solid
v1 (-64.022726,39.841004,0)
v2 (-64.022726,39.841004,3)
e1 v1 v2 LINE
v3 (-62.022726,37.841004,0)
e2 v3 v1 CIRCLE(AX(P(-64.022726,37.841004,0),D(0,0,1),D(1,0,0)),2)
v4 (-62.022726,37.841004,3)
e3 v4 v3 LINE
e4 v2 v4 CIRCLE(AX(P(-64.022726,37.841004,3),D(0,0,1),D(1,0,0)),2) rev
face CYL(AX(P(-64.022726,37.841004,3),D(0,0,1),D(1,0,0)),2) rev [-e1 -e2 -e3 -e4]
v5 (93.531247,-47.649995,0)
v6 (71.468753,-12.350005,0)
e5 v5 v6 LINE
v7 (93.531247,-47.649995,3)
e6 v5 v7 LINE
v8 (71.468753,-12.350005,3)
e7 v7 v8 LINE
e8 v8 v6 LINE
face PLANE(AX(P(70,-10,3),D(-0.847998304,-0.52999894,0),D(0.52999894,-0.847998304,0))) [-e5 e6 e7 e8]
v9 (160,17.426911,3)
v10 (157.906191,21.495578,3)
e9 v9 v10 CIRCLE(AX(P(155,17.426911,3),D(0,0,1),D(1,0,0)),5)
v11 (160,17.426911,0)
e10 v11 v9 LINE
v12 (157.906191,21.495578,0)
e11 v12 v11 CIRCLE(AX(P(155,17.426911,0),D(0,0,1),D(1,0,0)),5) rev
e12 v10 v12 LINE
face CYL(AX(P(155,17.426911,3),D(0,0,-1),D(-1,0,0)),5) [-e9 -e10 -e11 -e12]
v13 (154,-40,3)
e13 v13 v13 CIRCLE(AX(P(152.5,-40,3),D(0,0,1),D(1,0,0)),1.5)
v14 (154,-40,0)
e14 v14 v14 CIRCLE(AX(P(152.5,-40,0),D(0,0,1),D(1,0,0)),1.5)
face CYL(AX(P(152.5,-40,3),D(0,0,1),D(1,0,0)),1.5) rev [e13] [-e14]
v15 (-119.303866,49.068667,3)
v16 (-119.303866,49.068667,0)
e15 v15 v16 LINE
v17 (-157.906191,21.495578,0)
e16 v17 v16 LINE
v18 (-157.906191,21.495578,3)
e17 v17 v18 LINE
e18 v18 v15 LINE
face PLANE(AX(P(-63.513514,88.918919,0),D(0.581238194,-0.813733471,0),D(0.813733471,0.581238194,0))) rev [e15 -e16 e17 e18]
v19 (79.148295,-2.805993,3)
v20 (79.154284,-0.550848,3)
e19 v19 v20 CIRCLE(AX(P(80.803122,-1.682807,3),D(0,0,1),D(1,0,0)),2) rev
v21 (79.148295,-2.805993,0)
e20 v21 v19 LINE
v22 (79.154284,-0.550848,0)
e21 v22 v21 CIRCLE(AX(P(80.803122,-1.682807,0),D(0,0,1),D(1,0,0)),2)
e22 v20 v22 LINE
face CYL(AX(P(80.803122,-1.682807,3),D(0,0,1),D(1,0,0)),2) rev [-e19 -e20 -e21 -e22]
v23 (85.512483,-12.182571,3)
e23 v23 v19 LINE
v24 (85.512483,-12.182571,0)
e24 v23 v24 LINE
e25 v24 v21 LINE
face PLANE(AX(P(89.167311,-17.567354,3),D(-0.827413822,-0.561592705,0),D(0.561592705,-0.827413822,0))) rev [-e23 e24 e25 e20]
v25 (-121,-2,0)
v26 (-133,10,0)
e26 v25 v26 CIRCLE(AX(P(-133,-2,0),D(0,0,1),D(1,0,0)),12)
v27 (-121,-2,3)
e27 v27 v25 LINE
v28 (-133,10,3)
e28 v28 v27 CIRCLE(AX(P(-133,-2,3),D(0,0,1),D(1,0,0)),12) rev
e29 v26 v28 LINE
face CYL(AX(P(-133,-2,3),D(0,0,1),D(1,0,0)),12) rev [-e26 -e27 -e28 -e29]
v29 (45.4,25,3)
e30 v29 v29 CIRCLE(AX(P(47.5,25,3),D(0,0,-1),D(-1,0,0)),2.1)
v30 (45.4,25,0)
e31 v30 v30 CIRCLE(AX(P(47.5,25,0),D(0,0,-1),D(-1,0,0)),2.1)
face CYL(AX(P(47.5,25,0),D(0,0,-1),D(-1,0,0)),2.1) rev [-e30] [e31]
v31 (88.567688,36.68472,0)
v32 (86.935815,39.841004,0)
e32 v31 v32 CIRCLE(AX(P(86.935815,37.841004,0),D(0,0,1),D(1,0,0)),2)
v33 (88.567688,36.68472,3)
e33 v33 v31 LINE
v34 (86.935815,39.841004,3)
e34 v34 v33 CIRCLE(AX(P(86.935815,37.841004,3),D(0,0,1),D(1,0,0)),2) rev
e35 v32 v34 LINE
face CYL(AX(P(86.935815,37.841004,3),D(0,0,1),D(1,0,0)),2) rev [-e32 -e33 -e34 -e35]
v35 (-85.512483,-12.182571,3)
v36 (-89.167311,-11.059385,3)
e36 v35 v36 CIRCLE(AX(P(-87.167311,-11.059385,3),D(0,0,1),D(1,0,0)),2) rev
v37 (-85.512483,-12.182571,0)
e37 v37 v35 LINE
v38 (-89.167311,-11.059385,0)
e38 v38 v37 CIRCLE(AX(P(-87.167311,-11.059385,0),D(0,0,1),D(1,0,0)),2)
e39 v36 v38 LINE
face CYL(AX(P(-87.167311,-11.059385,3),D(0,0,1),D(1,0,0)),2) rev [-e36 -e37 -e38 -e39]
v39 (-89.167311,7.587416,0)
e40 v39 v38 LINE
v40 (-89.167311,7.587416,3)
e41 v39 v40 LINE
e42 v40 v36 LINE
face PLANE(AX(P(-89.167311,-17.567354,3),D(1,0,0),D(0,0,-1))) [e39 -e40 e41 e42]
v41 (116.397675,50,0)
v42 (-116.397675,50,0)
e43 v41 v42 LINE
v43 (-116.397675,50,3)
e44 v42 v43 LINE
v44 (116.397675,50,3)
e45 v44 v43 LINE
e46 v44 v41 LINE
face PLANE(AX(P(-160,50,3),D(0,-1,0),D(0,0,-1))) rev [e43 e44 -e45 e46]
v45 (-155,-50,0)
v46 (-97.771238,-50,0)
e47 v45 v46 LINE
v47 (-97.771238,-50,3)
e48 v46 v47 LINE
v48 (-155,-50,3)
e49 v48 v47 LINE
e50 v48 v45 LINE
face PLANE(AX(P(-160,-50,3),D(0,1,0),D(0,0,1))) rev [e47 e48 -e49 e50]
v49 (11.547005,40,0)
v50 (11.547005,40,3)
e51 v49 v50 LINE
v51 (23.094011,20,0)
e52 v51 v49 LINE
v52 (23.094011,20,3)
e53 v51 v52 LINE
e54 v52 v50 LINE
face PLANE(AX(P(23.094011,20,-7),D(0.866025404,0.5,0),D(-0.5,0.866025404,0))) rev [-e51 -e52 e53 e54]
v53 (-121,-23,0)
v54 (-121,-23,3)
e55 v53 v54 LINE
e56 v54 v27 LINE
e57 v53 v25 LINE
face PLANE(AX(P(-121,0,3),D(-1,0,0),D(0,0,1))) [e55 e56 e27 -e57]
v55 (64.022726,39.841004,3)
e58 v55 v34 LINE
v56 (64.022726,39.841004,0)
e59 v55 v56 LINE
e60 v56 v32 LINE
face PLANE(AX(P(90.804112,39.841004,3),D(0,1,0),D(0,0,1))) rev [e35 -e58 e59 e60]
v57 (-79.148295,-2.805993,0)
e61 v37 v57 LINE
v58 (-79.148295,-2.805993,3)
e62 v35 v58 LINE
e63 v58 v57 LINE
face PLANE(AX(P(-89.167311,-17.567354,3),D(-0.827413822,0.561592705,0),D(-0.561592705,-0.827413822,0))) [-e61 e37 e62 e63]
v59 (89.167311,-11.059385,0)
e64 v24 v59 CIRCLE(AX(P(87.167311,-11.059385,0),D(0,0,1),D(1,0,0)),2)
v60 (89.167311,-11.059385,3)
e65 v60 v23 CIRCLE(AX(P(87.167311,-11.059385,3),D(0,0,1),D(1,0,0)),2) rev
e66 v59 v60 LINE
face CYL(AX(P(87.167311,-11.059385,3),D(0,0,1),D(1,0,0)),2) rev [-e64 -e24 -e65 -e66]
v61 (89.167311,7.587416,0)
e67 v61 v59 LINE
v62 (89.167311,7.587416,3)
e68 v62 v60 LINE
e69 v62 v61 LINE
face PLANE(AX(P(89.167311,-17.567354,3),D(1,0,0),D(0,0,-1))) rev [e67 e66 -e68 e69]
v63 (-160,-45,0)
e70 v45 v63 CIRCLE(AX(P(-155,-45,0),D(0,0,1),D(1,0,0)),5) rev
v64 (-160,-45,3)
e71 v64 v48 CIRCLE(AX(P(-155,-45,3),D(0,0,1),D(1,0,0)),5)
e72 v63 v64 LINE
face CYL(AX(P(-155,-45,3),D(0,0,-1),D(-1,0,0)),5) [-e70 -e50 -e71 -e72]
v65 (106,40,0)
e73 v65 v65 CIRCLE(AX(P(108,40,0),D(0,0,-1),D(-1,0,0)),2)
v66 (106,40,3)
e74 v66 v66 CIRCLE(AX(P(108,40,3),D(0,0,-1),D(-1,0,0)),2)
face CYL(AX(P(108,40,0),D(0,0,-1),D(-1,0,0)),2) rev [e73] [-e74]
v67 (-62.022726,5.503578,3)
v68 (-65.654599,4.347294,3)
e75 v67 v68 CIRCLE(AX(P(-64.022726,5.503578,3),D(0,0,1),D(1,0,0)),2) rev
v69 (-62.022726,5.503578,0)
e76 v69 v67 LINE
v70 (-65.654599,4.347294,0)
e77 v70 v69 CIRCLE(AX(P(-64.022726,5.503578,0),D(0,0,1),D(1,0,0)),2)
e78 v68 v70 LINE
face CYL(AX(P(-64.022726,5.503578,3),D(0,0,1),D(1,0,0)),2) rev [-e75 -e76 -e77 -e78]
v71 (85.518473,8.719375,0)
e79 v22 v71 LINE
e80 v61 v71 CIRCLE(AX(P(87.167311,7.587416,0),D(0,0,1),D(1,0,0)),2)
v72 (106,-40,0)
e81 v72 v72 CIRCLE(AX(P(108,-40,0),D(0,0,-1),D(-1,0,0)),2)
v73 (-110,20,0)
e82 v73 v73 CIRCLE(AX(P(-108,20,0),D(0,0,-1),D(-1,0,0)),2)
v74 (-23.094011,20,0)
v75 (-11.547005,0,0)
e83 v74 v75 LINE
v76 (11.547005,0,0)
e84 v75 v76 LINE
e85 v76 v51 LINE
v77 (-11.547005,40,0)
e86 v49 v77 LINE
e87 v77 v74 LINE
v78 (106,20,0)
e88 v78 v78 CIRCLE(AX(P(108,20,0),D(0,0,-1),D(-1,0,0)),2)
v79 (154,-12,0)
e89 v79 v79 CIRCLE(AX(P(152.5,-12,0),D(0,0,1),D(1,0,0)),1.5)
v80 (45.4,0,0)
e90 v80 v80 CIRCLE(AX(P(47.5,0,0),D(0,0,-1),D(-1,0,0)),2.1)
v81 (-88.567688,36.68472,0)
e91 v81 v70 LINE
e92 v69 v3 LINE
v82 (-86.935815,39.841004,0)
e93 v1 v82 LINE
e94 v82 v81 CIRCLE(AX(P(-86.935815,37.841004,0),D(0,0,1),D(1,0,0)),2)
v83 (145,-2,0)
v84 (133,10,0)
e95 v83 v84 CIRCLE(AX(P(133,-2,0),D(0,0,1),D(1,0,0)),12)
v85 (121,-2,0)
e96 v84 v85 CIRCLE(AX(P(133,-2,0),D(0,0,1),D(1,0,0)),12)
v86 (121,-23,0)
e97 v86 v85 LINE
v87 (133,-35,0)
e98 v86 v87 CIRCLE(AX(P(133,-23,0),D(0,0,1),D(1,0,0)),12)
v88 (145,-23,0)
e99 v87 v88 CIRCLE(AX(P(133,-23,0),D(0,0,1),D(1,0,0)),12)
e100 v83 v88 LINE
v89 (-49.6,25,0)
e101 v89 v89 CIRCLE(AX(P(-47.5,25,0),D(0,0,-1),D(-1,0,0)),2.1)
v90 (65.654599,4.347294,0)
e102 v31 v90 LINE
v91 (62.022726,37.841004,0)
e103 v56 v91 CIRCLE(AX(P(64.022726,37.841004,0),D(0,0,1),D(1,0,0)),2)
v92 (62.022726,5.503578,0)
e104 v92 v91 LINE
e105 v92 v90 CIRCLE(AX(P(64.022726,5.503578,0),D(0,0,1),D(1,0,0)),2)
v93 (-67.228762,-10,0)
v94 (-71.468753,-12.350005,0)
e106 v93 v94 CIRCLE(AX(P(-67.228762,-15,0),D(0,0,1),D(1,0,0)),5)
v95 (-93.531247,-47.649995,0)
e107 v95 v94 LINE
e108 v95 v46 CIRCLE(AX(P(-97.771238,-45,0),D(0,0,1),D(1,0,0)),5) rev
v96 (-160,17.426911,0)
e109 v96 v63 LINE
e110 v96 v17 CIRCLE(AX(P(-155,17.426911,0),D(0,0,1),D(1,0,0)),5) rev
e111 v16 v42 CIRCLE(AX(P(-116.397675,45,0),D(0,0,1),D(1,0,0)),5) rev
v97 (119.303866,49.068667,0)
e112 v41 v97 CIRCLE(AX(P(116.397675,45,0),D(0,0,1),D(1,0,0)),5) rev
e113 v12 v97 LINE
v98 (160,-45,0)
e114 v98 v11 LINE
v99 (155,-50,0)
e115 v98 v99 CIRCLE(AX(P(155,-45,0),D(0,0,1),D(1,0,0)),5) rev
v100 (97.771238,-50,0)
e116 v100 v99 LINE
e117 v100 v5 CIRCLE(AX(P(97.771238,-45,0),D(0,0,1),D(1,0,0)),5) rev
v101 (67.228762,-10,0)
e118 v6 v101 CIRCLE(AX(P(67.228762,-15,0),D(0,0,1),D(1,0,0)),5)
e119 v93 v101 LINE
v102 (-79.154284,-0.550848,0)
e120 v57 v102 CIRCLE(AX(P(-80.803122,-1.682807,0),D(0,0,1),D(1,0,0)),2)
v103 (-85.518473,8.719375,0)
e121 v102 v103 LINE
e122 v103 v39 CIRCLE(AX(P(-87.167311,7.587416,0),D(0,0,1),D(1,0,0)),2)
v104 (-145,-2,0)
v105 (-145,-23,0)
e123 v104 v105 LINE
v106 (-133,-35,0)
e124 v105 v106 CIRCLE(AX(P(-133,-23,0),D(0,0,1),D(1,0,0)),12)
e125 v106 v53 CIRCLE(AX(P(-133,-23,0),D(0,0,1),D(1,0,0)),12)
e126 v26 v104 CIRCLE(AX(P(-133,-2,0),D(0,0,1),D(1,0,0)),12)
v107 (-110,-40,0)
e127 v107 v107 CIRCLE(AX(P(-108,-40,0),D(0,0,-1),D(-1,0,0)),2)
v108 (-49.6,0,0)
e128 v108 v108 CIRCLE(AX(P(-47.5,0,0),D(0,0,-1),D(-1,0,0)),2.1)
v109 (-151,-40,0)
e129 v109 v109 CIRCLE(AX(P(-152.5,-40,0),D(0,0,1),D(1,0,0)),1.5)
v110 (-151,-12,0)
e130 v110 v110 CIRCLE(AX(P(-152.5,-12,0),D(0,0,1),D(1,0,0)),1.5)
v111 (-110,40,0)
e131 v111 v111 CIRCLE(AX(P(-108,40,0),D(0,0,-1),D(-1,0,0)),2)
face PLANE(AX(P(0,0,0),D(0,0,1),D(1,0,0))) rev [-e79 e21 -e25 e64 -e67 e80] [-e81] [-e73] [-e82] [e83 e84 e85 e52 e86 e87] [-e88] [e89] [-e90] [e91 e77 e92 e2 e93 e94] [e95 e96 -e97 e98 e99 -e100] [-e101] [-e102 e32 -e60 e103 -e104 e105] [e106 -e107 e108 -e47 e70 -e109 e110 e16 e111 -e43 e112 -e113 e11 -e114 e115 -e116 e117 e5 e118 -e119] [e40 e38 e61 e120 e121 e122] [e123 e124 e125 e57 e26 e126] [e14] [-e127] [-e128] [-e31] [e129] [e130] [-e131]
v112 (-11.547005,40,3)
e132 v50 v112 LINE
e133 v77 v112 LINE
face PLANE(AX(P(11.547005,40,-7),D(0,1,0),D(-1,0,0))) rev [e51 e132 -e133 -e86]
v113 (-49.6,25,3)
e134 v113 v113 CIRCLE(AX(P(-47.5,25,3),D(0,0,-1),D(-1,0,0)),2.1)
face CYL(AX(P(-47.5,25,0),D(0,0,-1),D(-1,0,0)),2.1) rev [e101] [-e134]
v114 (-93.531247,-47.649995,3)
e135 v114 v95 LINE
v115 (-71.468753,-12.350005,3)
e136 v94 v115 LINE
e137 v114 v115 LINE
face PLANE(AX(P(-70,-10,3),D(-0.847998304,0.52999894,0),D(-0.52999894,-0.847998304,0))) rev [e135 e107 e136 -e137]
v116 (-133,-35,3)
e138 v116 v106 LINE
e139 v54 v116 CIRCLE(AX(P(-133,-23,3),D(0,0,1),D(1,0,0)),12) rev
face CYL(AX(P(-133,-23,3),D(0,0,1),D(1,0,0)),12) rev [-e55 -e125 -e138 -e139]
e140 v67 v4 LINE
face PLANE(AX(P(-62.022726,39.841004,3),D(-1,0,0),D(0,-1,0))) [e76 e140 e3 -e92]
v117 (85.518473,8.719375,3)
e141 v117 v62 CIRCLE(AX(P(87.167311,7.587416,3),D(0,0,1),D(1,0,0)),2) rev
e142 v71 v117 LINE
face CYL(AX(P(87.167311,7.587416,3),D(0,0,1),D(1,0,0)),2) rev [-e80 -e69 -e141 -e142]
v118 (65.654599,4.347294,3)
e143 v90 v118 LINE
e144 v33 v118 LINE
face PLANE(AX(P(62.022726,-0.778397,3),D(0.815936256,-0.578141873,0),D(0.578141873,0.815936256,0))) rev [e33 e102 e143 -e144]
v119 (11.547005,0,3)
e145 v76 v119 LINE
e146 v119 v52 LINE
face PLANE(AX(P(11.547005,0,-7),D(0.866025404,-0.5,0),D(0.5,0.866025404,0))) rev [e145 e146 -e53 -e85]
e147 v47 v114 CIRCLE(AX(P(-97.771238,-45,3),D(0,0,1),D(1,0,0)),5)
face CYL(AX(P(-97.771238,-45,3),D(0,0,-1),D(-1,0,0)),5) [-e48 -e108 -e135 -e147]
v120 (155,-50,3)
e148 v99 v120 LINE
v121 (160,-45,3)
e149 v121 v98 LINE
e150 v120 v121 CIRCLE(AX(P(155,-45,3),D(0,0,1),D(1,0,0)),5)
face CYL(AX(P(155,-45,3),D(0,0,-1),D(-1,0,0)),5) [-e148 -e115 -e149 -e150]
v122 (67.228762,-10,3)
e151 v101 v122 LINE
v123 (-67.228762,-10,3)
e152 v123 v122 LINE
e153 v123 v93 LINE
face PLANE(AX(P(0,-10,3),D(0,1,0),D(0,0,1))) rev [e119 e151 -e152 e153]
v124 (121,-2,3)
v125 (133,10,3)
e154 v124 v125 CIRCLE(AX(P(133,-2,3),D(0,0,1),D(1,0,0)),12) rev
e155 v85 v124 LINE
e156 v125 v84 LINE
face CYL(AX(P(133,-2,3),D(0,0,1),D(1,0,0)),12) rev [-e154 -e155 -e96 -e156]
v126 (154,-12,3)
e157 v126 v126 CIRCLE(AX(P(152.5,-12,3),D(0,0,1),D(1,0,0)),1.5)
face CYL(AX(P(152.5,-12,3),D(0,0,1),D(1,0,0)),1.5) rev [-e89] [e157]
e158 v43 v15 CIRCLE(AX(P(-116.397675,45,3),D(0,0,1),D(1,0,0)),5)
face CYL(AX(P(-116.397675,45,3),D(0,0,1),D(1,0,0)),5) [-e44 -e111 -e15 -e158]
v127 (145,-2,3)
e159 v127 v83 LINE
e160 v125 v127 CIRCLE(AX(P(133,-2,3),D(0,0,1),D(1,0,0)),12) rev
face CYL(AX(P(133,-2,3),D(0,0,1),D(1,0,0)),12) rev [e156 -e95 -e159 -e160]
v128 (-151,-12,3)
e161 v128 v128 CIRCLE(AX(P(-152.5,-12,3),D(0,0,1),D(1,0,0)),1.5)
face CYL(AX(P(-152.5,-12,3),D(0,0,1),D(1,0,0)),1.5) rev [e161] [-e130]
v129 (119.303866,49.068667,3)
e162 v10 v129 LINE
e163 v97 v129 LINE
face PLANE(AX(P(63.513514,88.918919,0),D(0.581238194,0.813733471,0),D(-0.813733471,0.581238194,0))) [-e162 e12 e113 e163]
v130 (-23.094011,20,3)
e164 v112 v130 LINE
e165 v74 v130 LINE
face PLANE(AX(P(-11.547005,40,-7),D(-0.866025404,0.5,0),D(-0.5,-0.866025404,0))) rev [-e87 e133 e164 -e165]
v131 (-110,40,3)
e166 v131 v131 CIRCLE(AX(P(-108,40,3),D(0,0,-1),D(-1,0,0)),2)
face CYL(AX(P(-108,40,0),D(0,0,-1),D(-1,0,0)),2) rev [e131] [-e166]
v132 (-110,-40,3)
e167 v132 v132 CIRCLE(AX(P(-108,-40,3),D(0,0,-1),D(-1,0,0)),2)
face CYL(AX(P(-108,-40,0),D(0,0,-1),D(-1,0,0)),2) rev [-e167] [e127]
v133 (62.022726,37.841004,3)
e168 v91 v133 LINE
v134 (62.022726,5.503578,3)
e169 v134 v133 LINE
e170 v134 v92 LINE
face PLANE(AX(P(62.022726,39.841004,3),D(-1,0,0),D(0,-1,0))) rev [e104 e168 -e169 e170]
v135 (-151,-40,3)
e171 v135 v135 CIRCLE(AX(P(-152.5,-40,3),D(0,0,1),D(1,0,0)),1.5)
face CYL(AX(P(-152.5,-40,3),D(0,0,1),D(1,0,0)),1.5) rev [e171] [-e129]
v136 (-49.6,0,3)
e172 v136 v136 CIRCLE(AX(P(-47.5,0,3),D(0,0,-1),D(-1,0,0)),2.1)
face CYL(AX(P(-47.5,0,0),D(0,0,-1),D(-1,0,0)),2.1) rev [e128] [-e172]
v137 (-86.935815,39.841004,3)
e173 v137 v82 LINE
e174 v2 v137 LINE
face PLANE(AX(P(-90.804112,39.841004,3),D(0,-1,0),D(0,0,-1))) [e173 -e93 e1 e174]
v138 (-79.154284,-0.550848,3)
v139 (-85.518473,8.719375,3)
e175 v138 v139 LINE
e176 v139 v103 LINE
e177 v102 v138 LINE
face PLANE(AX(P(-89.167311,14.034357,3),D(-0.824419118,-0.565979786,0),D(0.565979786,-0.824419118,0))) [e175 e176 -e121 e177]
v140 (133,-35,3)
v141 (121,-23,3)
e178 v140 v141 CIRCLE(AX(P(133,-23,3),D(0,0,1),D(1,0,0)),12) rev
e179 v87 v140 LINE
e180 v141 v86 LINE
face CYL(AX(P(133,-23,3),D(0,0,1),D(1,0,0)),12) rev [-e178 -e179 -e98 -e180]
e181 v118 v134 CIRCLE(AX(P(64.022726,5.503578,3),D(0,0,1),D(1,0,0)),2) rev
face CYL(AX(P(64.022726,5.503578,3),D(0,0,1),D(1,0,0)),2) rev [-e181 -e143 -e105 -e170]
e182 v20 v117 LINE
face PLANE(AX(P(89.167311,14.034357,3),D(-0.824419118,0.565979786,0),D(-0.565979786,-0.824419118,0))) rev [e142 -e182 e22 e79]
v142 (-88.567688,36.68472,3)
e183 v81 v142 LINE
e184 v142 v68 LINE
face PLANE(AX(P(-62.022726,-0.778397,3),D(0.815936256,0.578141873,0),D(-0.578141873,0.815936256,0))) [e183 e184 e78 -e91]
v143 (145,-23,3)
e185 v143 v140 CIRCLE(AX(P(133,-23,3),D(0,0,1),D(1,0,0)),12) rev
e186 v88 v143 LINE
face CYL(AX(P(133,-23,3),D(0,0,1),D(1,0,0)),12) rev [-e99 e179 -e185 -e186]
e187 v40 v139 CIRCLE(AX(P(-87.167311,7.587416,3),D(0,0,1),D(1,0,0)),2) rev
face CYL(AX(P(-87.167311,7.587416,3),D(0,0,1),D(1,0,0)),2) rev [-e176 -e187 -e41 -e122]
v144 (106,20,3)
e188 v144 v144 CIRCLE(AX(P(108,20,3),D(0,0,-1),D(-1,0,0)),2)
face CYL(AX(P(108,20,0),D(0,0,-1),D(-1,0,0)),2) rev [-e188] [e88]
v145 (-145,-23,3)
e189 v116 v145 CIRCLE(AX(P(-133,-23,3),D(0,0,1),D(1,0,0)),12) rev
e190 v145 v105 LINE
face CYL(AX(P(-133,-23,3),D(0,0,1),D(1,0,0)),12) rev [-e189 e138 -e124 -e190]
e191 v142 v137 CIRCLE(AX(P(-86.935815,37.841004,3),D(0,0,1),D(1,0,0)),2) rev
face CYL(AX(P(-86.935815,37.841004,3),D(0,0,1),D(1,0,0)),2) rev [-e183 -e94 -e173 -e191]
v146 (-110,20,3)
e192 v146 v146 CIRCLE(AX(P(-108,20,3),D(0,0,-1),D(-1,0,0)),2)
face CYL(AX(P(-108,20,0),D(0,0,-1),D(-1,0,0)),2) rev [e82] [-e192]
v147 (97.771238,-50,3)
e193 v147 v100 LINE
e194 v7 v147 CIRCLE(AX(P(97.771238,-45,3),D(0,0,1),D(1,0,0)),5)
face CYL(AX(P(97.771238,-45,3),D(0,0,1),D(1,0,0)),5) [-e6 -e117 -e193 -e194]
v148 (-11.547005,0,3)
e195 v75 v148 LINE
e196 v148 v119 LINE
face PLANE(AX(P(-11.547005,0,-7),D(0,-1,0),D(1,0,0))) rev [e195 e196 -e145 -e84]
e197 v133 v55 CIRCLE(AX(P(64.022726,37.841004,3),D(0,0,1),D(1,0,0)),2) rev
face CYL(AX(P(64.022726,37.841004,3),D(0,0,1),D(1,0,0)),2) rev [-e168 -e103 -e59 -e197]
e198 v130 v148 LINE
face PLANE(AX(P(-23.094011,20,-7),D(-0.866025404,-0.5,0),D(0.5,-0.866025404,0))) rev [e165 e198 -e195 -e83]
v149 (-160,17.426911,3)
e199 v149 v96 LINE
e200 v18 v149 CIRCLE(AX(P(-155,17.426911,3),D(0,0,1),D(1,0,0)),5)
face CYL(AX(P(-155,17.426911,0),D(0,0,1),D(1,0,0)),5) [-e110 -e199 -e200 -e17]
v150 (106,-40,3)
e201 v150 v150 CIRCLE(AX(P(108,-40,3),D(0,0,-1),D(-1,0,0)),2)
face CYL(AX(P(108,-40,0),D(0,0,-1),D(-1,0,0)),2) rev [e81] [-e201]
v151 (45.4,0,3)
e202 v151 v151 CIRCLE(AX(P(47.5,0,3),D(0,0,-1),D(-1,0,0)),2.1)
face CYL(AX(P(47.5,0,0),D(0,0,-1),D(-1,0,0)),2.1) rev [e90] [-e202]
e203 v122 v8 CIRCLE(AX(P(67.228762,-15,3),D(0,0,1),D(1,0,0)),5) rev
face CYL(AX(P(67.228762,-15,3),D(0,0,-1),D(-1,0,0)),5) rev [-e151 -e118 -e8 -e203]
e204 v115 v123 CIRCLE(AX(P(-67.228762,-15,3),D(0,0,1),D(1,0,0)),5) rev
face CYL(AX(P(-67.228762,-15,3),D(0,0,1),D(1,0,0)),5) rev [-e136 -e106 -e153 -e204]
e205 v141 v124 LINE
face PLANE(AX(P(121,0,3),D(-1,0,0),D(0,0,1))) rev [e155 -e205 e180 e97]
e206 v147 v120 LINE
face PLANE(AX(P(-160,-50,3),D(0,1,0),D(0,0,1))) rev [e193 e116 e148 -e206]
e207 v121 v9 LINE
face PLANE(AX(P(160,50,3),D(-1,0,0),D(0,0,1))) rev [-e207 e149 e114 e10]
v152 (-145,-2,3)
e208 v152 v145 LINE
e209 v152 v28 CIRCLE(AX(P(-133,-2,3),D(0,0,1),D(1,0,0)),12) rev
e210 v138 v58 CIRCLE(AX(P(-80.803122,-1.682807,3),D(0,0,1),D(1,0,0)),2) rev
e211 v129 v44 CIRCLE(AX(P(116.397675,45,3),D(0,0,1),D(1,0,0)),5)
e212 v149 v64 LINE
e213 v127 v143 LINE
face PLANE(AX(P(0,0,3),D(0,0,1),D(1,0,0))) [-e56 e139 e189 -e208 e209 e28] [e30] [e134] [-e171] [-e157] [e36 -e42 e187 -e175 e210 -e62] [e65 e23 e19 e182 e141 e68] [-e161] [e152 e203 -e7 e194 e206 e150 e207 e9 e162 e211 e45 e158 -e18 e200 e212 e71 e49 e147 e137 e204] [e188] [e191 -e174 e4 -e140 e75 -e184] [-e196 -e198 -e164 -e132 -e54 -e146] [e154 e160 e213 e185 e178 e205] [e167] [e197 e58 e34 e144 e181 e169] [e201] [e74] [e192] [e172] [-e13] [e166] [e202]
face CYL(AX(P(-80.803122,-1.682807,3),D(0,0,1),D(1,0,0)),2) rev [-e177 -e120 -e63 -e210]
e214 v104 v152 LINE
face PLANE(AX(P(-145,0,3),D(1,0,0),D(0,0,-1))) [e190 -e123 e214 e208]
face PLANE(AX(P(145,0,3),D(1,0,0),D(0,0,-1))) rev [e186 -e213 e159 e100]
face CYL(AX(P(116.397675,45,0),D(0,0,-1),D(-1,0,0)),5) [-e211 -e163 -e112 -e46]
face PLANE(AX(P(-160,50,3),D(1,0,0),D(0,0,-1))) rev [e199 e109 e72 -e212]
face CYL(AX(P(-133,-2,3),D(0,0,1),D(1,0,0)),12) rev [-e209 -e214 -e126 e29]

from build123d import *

# Parameters (mm, degrees)
SKETCH_1_W                  = 320
SKETCH_1_H                  = 100
EXTRUDE_1_DEPTH             = 3
HOLE_WIZARD_4_0_4_1_D       = 4
HOLE_WIZARD_4_2_4_2_1_D     = 4.2
PATTERN_LINEAR_1_COUNT      = 2
PATTERN_LINEAR_1_PITCH      = 95
PATTERN_LINEAR_1_COUNT_DIR2 = 2
PATTERN_LINEAR_1_PITCH_DIR2 = 25
CUT_EXTRUDE_1_DEPTH         = 3
SKETCH_8_W                  = 24
SKETCH_8_H                  = 45
CUT_EXTRUDE_6_DEPTH         = 3
PATTERN_LINEAR_2_COUNT      = 2
PATTERN_LINEAR_2_PITCH      = 60
PATTERN_LINEAR_2_COPY_1_D   = 4
HOLE_WIZARD_3_0_3_1_D       = 3
CUT_EXTRUDE_8_DEPTH         = 3
FILLET_1_R                  = 12
PATTERN_LINEAR_3_COUNT      = 2
PATTERN_LINEAR_3_PITCH      = 80
PATTERN_LINEAR_3_COPY_1_D   = 4
FILLET_2_R                  = 5
CUT_EXTRUDE_9_DEPTH         = 3
FILLET_3_R                  = 2
CUT_EXTRUDE_10_DEPTH        = 10


with BuildPart() as part:
    # 草图1 → 凸台-拉伸1 (new body)
    with BuildSketch(Plane.XY):
        Rectangle(SKETCH_1_W, SKETCH_1_H)
    extrude(amount=EXTRUDE_1_DEPTH)

    # Ø4.0 (4) 直径孔1 (through all)
    with Locations(Plane(origin=(0, 0, 0), x_dir=(-1, 0, 0), z_dir=(0, 0, -1))):
        with Locations((108, -40)):
            hole_wizard_4_0_4_1 = Hole(HOLE_WIZARD_4_0_4_1_D / 2)

    # 镜向1: Ø4.0 (4) 直径孔1 across plane
    add(hole_wizard_4_0_4_1.mirror(Plane(origin=(0, 0, 0), x_dir=(0, 0, 1), z_dir=(1, 0, 0))), mode=Mode.SUBTRACT)

    # Ø4.2 (4.2) 直径孔1 (through all)
    with Locations(Plane(origin=(0, 0, 0), x_dir=(-1, 0, 0), z_dir=(0, 0, -1))):
        with Locations((47.5, 0)):
            hole_wizard_4_2_4_2_1 = Hole(HOLE_WIZARD_4_2_4_2_1_D / 2)

    # 阵列(线性)1: Hole Wizard 4.2 _4.2_ _1 2 × 2
    with Locations(*[(i * PATTERN_LINEAR_1_PITCH, j * PATTERN_LINEAR_1_PITCH_DIR2, 0) for i in range(PATTERN_LINEAR_1_COUNT) for j in range(PATTERN_LINEAR_1_COUNT_DIR2) if (i, j) != (0, 0)]):
        add(hole_wizard_4_2_4_2_1, mode=Mode.SUBTRACT)

    # 草图6 → 切除-拉伸1 (cut)
    with BuildSketch(Plane(origin=(0, 0, 0), x_dir=(-1, 0, 0), z_dir=(0, 0, -1))):
        Polygon((0, -50), (0, -10), (70, -10), (95, -50), align=None)
    cut_extrude_1 = extrude(amount=-CUT_EXTRUDE_1_DEPTH, mode=Mode.SUBTRACT)

    # 镜向2: 切除-拉伸1 across plane
    add(cut_extrude_1.mirror(Plane(origin=(0, -50, 3), x_dir=(0, 0, 1), z_dir=(1, 0, 0))), mode=Mode.SUBTRACT)

    # 草图8 → 切除-拉伸6 (cut)
    with BuildSketch(Plane(origin=(0, 0, 0), x_dir=(-1, 0, 0), z_dir=(0, 0, -1))):
        with Locations((-133, -12.5)):
            Rectangle(SKETCH_8_W, SKETCH_8_H)
    cut_extrude_6 = extrude(amount=-CUT_EXTRUDE_6_DEPTH, mode=Mode.SUBTRACT)

    # 镜向4: 切除-拉伸6 across plane
    add(cut_extrude_6.mirror(Plane(origin=(0, 0, 0), x_dir=(0, 0, 1), z_dir=(1, 0, 0))), mode=Mode.SUBTRACT)

    # 阵列(线性)2: Ø4.0 (4) 直径孔1 ×2
    with Locations(*[(0, i * PATTERN_LINEAR_2_PITCH, 0) for i in range(1, PATTERN_LINEAR_2_COUNT)]):
        add(hole_wizard_4_0_4_1, mode=Mode.SUBTRACT)

    # 阵列(线性)2 copy 1 (through all)
    with Locations(Plane(origin=(0, 60, 0), x_dir=(1, 0, 0), z_dir=(0, 0, -1))):
        with Locations((108, 40)):
            Hole(PATTERN_LINEAR_2_COPY_1_D / 2)

    # Ø3.0 (3) 直径孔1 (through all)
    with Locations(Plane.XY.offset(3)):
        with Locations((-152.5, -40), (-152.5, -12)):
            hole_wizard_3_0_3_1 = Hole(HOLE_WIZARD_3_0_3_1_D / 2)

    # 草图11 → 切除-拉伸8 (cut)
    with BuildSketch(Plane.XY.offset(3)):
        Polygon((-118, 50), (-160, 50), (-160, 20), align=None)
    cut_extrude_8 = extrude(amount=-CUT_EXTRUDE_8_DEPTH, mode=Mode.SUBTRACT)

    # 镜向6: 切除-拉伸8 across plane
    add(cut_extrude_8.mirror(Plane(origin=(0, 0, 0), x_dir=(0, 0, 1), z_dir=(1, 0, 0))), mode=Mode.SUBTRACT)

    # 镜向7: Ø3.0 (3) 直径孔1 across plane
    add(hole_wizard_3_0_3_1.mirror(Plane(origin=(0, 0, 0), x_dir=(0, 0, 1), z_dir=(1, 0, 0))), mode=Mode.SUBTRACT)

    # 圆角1
    fillet_1_edges = [part.edges().sort_by_distance(p)[0] for p in [
        (145, -35, 1.5),
        (121, -35, 1.5),
        (145, 10, 1.5),
        (121, 10, 1.5),
        (-145, -35, 1.5),
        (-121, -35, 1.5),
        (-145, 10, 1.5),
        (-121, 10, 1.5),
    ]]
    fillet(fillet_1_edges, radius=FILLET_1_R - 0.0001)  # a hair under: the kernel refuses the full size

    # 阵列(线性)3: Ø4.0 (4) 直径孔1 ×2
    with Locations(*[(0, i * PATTERN_LINEAR_3_PITCH, 0) for i in range(1, PATTERN_LINEAR_3_COUNT)]):
        add(hole_wizard_4_0_4_1, mode=Mode.SUBTRACT)

    # 阵列(线性)3 copy 1 (through all)
    with Locations(Plane(origin=(0, 80, 0), x_dir=(1, 0, 0), z_dir=(0, 0, -1))):
        with Locations((108, 40)):
            Hole(PATTERN_LINEAR_3_COPY_1_D / 2)

    # 圆角2
    fillet_2_edges = [part.edges().sort_by_distance(p)[0] for p in [
        (-160, 20, 1.5),
        (-118, 50, 1.5),
        (160, 20, 1.5),
        (118, 50, 1.5),
        (-95, -50, 1.5),
        (-70, -10, 1.5),
        (95, -50, 1.5),
        (70, -10, 1.5),
        (160, -50, 1.5),
        (-160, -50, 1.5),
    ]]
    fillet(fillet_2_edges, radius=FILLET_2_R)

    # 草图12 → 切除-拉伸9 (cut)
    with BuildSketch(Plane(origin=(0, 0, 0), x_dir=(-1, 0, 0), z_dir=(0, 0, -1))):
        Polygon((-89.16731107, -17.567353927), (-78.38158698, -1.676376149), (-89.16731107, 14.034356584), align=None)
        Polygon((-90.804111964, 39.84100352), (-62.022726086, 39.84100352), (-62.022726086, -0.778396903), align=None)
    cut_extrude_9 = extrude(amount=-CUT_EXTRUDE_9_DEPTH, mode=Mode.SUBTRACT)

    # 镜向8: 切除-拉伸9 across plane
    add(cut_extrude_9.mirror(Plane(origin=(0, 0, 0), x_dir=(0, 0, 1), z_dir=(1, 0, 0))), mode=Mode.SUBTRACT)

    # 圆角3
    fillet_3_edges = [part.edges().sort_by_distance(p)[0] for p in [
        (89.16731107, -17.567353927, 1.5),
        (89.16731107, 14.034356584, 1.5),
        (78.38158698, -1.676376149, 1.5),
        (62.022726086, -0.778396903, 1.5),
        (90.804111964, 39.84100352, 1.5),
        (62.022726086, 39.84100352, 1.5),
        (-89.16731107, 14.034356584, 1.5),
        (-89.16731107, -17.567353927, 1.5),
        (-78.38158698, -1.676376149, 1.5),
        (-90.804111964, 39.84100352, 1.5),
        (-62.022726086, -0.778396903, 1.5),
        (-62.022726086, 39.84100352, 1.5),
    ]]
    fillet(fillet_3_edges, radius=FILLET_3_R)

    # 草图13 → 切除-拉伸10 (cut)
    with BuildSketch(Plane.XY.offset(3)):
        Polygon((-23.094010768, 20), (-11.547005384, 0), (11.547005384, 0), (23.094010768, 20), (11.547005384, 40), (-11.547005384, 40), align=None)
    extrude(amount=-CUT_EXTRUDE_10_DEPTH, mode=Mode.SUBTRACT)


solid = part.part
